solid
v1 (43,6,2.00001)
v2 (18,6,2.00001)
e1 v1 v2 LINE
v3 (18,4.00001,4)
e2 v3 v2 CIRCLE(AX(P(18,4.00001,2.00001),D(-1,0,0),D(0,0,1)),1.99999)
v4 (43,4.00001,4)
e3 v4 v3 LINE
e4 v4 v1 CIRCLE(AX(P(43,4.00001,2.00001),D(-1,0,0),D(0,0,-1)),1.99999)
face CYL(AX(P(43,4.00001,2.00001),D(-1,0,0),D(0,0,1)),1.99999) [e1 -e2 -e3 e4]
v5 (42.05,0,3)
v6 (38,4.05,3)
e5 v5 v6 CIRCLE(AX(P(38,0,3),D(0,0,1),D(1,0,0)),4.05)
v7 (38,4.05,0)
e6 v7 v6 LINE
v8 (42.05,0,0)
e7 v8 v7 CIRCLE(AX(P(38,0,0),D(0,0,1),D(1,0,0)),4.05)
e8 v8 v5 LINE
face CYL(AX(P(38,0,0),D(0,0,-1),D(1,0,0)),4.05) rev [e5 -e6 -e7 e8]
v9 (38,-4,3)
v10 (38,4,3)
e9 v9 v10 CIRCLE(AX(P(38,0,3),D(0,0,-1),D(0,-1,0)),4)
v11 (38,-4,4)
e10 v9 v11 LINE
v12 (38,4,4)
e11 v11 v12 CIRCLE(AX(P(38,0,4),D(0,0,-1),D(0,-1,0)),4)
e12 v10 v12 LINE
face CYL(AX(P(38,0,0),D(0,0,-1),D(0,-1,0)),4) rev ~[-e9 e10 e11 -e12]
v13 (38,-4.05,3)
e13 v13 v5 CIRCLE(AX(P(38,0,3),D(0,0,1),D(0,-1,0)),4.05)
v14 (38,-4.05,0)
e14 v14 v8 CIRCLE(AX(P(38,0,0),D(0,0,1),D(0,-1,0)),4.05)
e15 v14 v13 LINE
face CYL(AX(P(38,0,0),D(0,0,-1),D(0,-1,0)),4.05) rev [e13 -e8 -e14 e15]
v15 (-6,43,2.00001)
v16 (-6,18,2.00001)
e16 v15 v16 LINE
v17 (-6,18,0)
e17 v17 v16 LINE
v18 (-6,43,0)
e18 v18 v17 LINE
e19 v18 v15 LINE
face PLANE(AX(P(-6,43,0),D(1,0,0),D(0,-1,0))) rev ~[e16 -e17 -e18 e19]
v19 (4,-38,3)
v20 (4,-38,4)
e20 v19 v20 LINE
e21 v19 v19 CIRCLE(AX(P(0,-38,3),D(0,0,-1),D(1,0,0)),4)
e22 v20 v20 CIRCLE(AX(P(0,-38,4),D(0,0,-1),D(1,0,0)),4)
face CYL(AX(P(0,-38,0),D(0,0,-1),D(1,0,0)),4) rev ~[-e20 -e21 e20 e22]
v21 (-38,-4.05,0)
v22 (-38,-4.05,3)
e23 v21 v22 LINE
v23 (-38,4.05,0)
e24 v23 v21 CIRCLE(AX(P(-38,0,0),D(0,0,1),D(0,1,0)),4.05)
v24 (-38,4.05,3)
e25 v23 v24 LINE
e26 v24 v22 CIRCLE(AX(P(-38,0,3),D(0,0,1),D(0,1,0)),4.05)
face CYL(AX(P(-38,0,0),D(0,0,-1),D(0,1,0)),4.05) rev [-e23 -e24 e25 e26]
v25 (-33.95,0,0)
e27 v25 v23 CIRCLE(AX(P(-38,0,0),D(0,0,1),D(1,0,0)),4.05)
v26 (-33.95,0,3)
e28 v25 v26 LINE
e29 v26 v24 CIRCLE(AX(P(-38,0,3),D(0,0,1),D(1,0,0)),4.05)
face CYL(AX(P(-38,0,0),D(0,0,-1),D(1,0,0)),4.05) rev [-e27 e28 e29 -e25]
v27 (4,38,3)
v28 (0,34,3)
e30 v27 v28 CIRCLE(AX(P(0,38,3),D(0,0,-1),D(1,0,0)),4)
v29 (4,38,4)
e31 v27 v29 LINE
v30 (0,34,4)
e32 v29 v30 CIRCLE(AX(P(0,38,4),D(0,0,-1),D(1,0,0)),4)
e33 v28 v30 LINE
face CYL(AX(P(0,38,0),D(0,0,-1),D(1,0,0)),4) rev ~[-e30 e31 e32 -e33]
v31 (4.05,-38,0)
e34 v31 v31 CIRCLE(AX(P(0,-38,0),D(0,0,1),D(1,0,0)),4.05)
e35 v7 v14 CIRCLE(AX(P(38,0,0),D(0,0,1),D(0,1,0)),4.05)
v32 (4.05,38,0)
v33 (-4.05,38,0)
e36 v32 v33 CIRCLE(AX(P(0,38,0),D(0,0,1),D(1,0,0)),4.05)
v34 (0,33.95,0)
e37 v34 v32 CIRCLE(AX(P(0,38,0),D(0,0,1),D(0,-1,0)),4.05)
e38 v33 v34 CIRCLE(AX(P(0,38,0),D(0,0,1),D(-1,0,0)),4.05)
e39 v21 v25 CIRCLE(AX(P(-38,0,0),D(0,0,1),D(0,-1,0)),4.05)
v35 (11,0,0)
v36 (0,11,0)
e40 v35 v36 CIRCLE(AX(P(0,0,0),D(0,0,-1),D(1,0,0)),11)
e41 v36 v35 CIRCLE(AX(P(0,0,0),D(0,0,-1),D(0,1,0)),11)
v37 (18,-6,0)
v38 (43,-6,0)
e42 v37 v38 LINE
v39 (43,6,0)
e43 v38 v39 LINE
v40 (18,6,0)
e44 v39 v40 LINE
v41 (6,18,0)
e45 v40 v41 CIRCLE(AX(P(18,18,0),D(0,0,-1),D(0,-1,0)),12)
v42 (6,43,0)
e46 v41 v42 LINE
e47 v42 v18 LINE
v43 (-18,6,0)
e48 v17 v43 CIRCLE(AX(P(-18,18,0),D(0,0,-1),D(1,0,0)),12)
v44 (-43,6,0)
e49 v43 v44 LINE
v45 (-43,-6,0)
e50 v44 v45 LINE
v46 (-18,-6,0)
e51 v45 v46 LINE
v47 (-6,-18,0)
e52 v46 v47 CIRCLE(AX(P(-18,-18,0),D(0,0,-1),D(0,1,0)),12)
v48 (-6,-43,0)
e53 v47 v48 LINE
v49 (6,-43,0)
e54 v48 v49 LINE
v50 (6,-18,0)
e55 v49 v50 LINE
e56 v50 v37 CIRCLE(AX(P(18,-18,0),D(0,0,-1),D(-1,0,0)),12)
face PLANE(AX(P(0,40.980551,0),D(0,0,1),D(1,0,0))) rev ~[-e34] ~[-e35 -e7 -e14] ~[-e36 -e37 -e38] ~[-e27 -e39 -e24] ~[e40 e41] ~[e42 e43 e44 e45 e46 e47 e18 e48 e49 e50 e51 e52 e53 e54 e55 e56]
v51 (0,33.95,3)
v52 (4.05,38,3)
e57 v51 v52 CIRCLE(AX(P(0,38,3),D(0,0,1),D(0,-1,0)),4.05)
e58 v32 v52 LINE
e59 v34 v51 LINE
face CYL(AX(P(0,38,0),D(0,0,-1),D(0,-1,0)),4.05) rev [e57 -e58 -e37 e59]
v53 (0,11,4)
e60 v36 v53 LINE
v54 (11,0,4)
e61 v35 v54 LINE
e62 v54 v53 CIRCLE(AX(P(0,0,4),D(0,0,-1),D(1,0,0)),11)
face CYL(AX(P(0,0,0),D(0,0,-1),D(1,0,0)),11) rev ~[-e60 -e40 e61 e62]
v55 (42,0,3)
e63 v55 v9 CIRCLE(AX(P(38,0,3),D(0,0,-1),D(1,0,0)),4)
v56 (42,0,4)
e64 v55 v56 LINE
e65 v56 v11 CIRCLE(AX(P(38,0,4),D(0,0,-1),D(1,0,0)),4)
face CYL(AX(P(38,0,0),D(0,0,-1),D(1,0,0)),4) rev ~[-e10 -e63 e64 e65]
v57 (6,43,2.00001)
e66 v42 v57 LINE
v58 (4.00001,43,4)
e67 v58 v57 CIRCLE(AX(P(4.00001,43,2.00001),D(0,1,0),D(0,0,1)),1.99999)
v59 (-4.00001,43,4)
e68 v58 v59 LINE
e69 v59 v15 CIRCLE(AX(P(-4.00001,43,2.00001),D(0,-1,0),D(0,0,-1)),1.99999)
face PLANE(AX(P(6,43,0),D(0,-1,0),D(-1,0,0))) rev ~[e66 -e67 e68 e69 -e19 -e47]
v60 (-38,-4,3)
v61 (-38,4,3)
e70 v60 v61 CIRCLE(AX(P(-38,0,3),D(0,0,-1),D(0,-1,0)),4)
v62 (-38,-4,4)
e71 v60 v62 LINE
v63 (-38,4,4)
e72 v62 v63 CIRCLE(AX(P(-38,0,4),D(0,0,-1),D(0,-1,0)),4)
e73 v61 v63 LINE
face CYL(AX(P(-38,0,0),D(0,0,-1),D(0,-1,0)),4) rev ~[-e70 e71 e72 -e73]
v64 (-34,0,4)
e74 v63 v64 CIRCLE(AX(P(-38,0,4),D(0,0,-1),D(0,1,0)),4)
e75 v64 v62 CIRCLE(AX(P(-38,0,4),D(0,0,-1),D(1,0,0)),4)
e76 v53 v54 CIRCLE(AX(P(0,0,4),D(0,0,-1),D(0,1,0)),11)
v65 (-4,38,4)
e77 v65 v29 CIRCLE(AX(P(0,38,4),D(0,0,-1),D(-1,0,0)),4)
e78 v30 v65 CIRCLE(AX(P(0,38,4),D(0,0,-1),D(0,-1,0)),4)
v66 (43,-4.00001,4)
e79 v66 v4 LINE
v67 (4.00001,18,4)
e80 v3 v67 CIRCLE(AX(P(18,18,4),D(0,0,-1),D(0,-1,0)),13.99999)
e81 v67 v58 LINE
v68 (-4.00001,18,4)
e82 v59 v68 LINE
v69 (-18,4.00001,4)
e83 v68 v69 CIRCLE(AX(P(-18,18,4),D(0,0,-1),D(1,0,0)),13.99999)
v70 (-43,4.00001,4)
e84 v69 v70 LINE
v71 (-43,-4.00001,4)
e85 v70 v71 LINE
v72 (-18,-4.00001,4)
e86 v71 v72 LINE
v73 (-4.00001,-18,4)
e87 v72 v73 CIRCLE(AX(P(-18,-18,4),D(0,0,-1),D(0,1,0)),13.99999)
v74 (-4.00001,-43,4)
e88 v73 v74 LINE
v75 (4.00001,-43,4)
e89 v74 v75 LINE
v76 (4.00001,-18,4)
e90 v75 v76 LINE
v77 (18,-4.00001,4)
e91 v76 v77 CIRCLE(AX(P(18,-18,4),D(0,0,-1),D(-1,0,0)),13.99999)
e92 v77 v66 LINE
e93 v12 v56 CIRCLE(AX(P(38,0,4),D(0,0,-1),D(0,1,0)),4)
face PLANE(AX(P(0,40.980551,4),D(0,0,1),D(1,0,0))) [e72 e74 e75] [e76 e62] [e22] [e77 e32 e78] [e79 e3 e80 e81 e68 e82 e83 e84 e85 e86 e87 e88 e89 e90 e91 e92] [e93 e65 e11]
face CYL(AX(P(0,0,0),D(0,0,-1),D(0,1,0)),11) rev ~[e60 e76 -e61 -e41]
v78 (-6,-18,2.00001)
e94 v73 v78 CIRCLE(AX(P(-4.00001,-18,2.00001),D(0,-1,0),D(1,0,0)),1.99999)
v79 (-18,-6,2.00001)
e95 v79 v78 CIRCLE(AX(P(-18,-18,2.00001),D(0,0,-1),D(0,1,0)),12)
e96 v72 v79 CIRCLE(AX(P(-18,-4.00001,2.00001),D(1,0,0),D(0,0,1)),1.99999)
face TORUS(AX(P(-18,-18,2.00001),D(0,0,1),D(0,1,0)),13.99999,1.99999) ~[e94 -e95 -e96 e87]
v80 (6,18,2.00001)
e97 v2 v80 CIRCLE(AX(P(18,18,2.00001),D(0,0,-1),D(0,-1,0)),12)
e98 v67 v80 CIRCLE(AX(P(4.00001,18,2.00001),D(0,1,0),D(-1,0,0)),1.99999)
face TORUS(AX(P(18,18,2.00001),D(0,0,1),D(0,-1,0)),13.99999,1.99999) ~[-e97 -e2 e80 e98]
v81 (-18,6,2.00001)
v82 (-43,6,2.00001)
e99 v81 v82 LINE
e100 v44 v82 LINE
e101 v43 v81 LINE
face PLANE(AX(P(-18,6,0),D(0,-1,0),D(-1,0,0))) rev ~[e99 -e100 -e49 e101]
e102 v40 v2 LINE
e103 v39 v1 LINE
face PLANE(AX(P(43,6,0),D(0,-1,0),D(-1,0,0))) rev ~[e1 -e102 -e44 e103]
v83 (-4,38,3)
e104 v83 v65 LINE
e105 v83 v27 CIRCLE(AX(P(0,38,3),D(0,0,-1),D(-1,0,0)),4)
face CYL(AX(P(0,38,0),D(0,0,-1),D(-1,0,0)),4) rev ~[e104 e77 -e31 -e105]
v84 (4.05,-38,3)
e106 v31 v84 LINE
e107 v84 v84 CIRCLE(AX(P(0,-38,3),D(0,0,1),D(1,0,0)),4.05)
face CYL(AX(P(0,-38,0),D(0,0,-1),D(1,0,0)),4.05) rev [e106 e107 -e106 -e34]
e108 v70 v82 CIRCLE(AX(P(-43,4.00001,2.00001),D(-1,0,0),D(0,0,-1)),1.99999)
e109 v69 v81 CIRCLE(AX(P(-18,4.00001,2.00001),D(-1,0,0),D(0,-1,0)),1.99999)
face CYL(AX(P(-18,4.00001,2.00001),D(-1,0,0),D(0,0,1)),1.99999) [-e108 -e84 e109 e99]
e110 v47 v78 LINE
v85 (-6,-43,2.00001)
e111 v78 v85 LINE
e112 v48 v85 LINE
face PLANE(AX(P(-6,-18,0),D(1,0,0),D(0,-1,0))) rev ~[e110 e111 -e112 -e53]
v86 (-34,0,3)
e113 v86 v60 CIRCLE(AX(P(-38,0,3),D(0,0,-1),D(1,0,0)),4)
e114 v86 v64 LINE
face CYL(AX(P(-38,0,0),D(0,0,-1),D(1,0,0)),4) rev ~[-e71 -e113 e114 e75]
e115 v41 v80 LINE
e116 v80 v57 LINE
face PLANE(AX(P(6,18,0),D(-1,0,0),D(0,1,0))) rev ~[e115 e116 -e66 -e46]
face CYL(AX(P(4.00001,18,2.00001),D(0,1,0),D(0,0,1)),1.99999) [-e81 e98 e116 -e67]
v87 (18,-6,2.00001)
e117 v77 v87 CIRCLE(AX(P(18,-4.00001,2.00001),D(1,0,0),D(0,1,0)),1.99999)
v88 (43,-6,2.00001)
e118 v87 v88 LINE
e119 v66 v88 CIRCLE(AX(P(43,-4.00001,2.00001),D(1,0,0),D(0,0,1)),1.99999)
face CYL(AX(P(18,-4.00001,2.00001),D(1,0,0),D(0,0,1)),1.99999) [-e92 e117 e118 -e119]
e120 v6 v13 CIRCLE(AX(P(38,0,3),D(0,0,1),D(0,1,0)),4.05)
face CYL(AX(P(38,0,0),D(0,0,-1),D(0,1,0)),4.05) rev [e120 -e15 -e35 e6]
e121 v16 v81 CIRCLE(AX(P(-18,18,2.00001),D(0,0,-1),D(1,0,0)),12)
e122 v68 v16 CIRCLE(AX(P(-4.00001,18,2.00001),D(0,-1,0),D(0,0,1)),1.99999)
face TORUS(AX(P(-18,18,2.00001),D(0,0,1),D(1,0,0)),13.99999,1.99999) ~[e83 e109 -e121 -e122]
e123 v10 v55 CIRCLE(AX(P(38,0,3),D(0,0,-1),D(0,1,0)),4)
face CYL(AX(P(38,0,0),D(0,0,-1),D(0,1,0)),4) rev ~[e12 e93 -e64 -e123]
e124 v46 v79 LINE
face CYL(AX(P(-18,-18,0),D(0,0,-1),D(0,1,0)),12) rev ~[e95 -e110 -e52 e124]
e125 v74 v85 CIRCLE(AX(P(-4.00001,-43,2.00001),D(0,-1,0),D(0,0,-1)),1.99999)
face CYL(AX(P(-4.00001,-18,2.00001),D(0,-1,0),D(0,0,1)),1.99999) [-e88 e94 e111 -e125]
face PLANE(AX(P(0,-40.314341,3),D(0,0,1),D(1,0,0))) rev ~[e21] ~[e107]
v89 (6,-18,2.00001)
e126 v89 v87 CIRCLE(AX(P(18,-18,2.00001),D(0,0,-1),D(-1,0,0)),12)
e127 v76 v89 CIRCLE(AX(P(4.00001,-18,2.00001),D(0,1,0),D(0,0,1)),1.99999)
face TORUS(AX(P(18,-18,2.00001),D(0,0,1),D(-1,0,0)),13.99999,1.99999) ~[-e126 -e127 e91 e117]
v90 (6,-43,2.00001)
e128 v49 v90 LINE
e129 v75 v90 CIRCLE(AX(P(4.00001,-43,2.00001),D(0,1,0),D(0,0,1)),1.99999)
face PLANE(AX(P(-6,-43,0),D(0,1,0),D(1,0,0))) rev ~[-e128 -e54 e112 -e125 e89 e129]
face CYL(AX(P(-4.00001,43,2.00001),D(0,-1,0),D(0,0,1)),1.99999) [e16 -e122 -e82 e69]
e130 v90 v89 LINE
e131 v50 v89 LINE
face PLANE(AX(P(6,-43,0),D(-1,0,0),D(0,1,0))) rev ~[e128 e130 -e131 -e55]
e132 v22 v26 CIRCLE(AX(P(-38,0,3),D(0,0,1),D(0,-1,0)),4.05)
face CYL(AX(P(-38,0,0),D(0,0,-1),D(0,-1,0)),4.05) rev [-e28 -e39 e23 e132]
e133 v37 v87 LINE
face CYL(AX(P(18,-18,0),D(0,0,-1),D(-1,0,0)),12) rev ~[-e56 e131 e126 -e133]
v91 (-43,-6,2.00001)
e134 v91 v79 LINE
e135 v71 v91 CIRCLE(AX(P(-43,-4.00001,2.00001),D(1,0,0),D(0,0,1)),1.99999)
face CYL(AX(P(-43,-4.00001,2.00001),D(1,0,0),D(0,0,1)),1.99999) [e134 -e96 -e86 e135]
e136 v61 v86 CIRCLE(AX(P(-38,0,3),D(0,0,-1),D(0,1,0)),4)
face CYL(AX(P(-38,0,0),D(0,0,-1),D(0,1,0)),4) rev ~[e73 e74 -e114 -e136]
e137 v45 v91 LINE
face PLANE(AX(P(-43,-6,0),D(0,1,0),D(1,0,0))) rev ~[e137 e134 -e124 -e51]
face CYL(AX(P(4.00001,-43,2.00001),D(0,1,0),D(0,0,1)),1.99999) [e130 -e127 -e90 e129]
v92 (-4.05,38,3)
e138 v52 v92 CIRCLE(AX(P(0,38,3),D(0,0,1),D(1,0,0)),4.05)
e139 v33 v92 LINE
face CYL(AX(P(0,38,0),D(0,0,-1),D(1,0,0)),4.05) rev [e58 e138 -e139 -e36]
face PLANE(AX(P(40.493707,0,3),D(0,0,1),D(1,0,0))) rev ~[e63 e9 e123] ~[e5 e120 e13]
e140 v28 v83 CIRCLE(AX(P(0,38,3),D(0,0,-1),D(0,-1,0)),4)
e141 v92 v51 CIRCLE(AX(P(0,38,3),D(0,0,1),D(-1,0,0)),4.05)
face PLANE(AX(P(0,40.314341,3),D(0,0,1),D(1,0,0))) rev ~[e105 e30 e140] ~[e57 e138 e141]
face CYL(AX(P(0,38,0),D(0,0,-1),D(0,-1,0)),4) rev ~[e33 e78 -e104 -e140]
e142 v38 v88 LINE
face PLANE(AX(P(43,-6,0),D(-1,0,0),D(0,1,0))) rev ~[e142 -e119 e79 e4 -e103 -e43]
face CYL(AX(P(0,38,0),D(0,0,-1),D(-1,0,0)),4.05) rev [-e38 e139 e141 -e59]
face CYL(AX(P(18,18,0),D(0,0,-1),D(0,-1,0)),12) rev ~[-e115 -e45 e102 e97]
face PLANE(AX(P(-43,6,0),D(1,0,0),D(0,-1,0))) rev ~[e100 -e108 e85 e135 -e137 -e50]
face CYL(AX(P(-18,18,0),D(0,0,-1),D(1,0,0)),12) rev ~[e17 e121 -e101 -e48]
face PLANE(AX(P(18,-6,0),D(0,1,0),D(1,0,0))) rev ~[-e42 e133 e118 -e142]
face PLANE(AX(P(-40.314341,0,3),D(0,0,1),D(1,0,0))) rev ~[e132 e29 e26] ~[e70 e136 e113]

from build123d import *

# Parameters (mm, degrees)
F1_DEPTH = 4
F2_DEPTH = 3
F3_R     = 1.99999


# Not quite as in the source:
# - a fillet or chamfer is up to 0.001 mm smaller than in the source, because OpenCascade refuses the exact size
# - a feature names something its author has since deleted; it is built from what else it names


with BuildPart() as f1:
    # F0 (on Top) → F1 (new body)
    with BuildSketch(Plane.XY):
        with BuildLine():
            ThreePointArc((-4.05, 38), (0, 42.05), (4.05, 38))
            Line((4.05, 38), (6, 38))
            Line((6, 38), (6, 43))
            Line((6, 43), (-6, 43))
            Line((-6, 43), (-6, 38))
            Line((-6, 38), (-4.05, 38))
        make_face()
        with BuildLine():
            Line((6, 38), (4.05, 38))
            ThreePointArc((4.05, 38), (2.8637824638, 35.1362175362), (0, 33.95))
            ThreePointArc((0, 33.95), (-2.8637824638, 35.1362175362), (-4.05, 38))
            Line((-4.05, 38), (-6, 38))
            Line((-6, 38), (-6, 18))
            ThreePointArc((-6, 18), (-9.5147186258, 9.5147186258), (-18, 6))
            Line((-18, 6), (-38, 6))
            Line((-38, 6), (-38, 4.05))
            ThreePointArc((-38, 4.05), (-35.1362175362, 2.8637824638), (-33.95, 0))
            ThreePointArc((-33.95, 0), (-35.1362175362, -2.8637824638), (-38, -4.05))
            Line((-38, -4.05), (-38, -6))
            Line((-38, -6), (-18, -6))
            ThreePointArc((-18, -6), (-9.5147186258, -9.5147186258), (-6, -18))
            Line((-6, -18), (-6, -38))
            Line((-6, -38), (-4.05, -38))
            ThreePointArc((-4.05, -38), (0, -33.95), (4.05, -38))
            Line((4.05, -38), (6, -38))
            Line((6, -38), (6, -18))
            ThreePointArc((6, -18), (9.5147186258, -9.5147186258), (18, -6))
            Line((18, -6), (38, -6))
            Line((38, -6), (38, -4.05))
            ThreePointArc((38, -4.05), (33.95, 0), (38, 4.05))
            Line((38, 4.05), (38, 6))
            Line((38, 6), (18, 6))
            ThreePointArc((18, 6), (9.5147186258, 9.5147186258), (6, 18))
            Line((6, 18), (6, 38))
        make_face()
        with BuildLine():
            ThreePointArc((11, 0), (-7.7781745931, -7.7781745931), (0, 11))
            ThreePointArc((0, 11), (7.7781745931, 7.7781745931), (11, 0))
        make_face(mode=Mode.SUBTRACT)
        with BuildLine():
            Line((43, 6), (38, 6))
            Line((38, 6), (38, 4.05))
            ThreePointArc((38, 4.05), (40.8637824638, 2.8637824638), (42.05, 0))
            ThreePointArc((42.05, 0), (40.8637824638, -2.8637824638), (38, -4.05))
            Line((38, -4.05), (38, -6))
            Line((38, -6), (43, -6))
            Line((43, -6), (43, 6))
        make_face()
        with BuildLine():
            Line((6, -43), (6, -38))
            Line((6, -38), (4.05, -38))
            ThreePointArc((4.05, -38), (0, -42.05), (-4.05, -38))
            Line((-4.05, -38), (-6, -38))
            Line((-6, -38), (-6, -43))
            Line((-6, -43), (6, -43))
        make_face()
        with BuildLine():
            Line((-38, 4.05), (-38, 6))
            Line((-38, 6), (-43, 6))
            Line((-43, 6), (-43, -6))
            Line((-43, -6), (-38, -6))
            Line((-38, -6), (-38, -4.05))
            ThreePointArc((-38, -4.05), (-42.05, 0), (-38, 4.05))
        make_face()
        with BuildLine():
            Line((38, 4), (38, 4.05))
            ThreePointArc((38, 4.05), (33.95, 0), (38, -4.05))
            Line((38, -4.05), (38, -4))
            ThreePointArc((38, -4), (34, 0), (38, 4))
        make_face()
        with BuildLine():
            ThreePointArc((42.05, 0), (40.8637824638, 2.8637824638), (38, 4.05))
            Line((38, 4.05), (38, 4))
            ThreePointArc((38, 4), (40.8284271247, 2.8284271247), (42, 0))
            ThreePointArc((42, 0), (40.8284271247, -2.8284271247), (38, -4))
            Line((38, -4), (38, -4.05))
            ThreePointArc((38, -4.05), (40.8637824638, -2.8637824638), (42.05, 0))
        make_face()
        with BuildLine():
            Line((0, 33.95), (0, 34))
            ThreePointArc((0, 34), (-2.8284271247, 35.1715728753), (-4, 38))
            Line((-4, 38), (-4.05, 38))
            ThreePointArc((-4.05, 38), (-2.8637824638, 35.1362175362), (0, 33.95))
        make_face()
        with BuildLine():
            ThreePointArc((-33.95, 0), (-35.1362175362, 2.8637824638), (-38, 4.05))
            Line((-38, 4.05), (-38, 4))
            ThreePointArc((-38, 4), (-35.1715728753, 2.8284271247), (-34, 0))
            ThreePointArc((-34, 0), (-35.1715728753, -2.8284271247), (-38, -4))
            Line((-38, -4), (-38, -4.05))
            ThreePointArc((-38, -4.05), (-35.1362175362, -2.8637824638), (-33.95, 0))
        make_face()
        with BuildLine():
            Line((-38, 4), (-38, 4.05))
            ThreePointArc((-38, 4.05), (-42.05, 0), (-38, -4.05))
            Line((-38, -4.05), (-38, -4))
            ThreePointArc((-38, -4), (-42, 0), (-38, 4))
        make_face()
        with BuildLine():
            ThreePointArc((-4, 38), (0, 42), (4, 38))
            Line((4, 38), (4.05, 38))
            ThreePointArc((4.05, 38), (0, 42.05), (-4.05, 38))
            Line((-4.05, 38), (-4, 38))
        make_face()
        with BuildLine():
            Line((4.05, 38), (4, 38))
            ThreePointArc((4, 38), (2.8284271247, 35.1715728753), (0, 34))
            Line((0, 34), (0, 33.95))
            ThreePointArc((0, 33.95), (2.8637824638, 35.1362175362), (4.05, 38))
        make_face()
        with BuildLine():
            Line((4, -38), (4.05, -38))
            ThreePointArc((4.05, -38), (0, -33.95), (-4.05, -38))
            Line((-4.05, -38), (-4, -38))
            ThreePointArc((-4, -38), (0, -34), (4, -38))
        make_face()
        with BuildLine():
            ThreePointArc((-4.05, -38), (0, -42.05), (4.05, -38))
            Line((4.05, -38), (4, -38))
            ThreePointArc((4, -38), (0, -42), (-4, -38))
            Line((-4, -38), (-4.05, -38))
        make_face()
    extrude(amount=F1_DEPTH)

    # F0 (on Top) → F2 (cut)
    with BuildSketch(Plane.XY):
        with BuildLine():
            ThreePointArc((-4.05, -38), (0, -42.05), (4.05, -38))
            Line((4.05, -38), (4, -38))
            ThreePointArc((4, -38), (0, -42), (-4, -38))
            Line((-4, -38), (-4.05, -38))
        make_face()
        with BuildLine():
            Line((4, -38), (4.05, -38))
            ThreePointArc((4.05, -38), (0, -33.95), (-4.05, -38))
            Line((-4.05, -38), (-4, -38))
            ThreePointArc((-4, -38), (0, -34), (4, -38))
        make_face()
        with BuildLine():
            ThreePointArc((42.05, 0), (40.8637824638, 2.8637824638), (38, 4.05))
            Line((38, 4.05), (38, 4))
            ThreePointArc((38, 4), (40.8284271247, 2.8284271247), (42, 0))
            ThreePointArc((42, 0), (40.8284271247, -2.8284271247), (38, -4))
            Line((38, -4), (38, -4.05))
            ThreePointArc((38, -4.05), (40.8637824638, -2.8637824638), (42.05, 0))
        make_face()
        with BuildLine():
            ThreePointArc((42, 0), (40.8284271247, 2.8284271247), (38, 4))
            Line((38, 4), (38, 0))
            Line((38, 0), (38, -4))
            ThreePointArc((38, -4), (40.8284271247, -2.8284271247), (42, 0))
        make_face()
        with BuildLine():
            Line((38, 4), (38, 4.05))
            ThreePointArc((38, 4.05), (33.95, 0), (38, -4.05))
            Line((38, -4.05), (38, -4))
            ThreePointArc((38, -4), (34, 0), (38, 4))
        make_face()
        with BuildLine():
            Line((38, 0), (38, 4))
            ThreePointArc((38, 4), (34, 0), (38, -4))
            Line((38, -4), (38, 0))
        make_face()
        with BuildLine():
            ThreePointArc((-4, 38), (0, 42), (4, 38))
            Line((4, 38), (4.05, 38))
            ThreePointArc((4.05, 38), (0, 42.05), (-4.05, 38))
            Line((-4.05, 38), (-4, 38))
        make_face()
        with BuildLine():
            Line((4.05, 38), (4, 38))
            ThreePointArc((4, 38), (2.8284271247, 35.1715728753), (0, 34))
            Line((0, 34), (0, 33.95))
            ThreePointArc((0, 33.95), (2.8637824638, 35.1362175362), (4.05, 38))
        make_face()
        with BuildLine():
            Line((0, 33.95), (0, 34))
            ThreePointArc((0, 34), (-2.8284271247, 35.1715728753), (-4, 38))
            Line((-4, 38), (-4.05, 38))
            ThreePointArc((-4.05, 38), (-2.8637824638, 35.1362175362), (0, 33.95))
        make_face()
        with BuildLine():
            Line((0, 34), (0, 38))
            Line((0, 38), (-4, 38))
            ThreePointArc((-4, 38), (-2.8284271247, 35.1715728753), (0, 34))
        make_face()
        with BuildLine():
            Line((-38, 4), (-38, 4.05))
            ThreePointArc((-38, 4.05), (-42.05, 0), (-38, -4.05))
            Line((-38, -4.05), (-38, -4))
            ThreePointArc((-38, -4), (-42, 0), (-38, 4))
        make_face()
        with BuildLine():
            ThreePointArc((-33.95, 0), (-35.1362175362, 2.8637824638), (-38, 4.05))
            Line((-38, 4.05), (-38, 4))
            ThreePointArc((-38, 4), (-35.1715728753, 2.8284271247), (-34, 0))
            ThreePointArc((-34, 0), (-35.1715728753, -2.8284271247), (-38, -4))
            Line((-38, -4), (-38, -4.05))
            ThreePointArc((-38, -4.05), (-35.1362175362, -2.8637824638), (-33.95, 0))
        make_face()
    extrude(amount=F2_DEPTH, mode=Mode.SUBTRACT)

    # F3 (radius 2 in the source; OpenCascade refuses exactly that, so slightly less here)
    f3_edges = [f1.edges().sort_by_distance(p)[0] for p in [
        (-6, 30.5, 4),
        (6, 30.5, 4),
        (30.5, -6, 4),
        (9.514719, -9.514719, 4),
        (-9.514719, -9.514719, 4),
    ]]
    fillet(f3_edges, radius=F3_R)


solid = f1.part
